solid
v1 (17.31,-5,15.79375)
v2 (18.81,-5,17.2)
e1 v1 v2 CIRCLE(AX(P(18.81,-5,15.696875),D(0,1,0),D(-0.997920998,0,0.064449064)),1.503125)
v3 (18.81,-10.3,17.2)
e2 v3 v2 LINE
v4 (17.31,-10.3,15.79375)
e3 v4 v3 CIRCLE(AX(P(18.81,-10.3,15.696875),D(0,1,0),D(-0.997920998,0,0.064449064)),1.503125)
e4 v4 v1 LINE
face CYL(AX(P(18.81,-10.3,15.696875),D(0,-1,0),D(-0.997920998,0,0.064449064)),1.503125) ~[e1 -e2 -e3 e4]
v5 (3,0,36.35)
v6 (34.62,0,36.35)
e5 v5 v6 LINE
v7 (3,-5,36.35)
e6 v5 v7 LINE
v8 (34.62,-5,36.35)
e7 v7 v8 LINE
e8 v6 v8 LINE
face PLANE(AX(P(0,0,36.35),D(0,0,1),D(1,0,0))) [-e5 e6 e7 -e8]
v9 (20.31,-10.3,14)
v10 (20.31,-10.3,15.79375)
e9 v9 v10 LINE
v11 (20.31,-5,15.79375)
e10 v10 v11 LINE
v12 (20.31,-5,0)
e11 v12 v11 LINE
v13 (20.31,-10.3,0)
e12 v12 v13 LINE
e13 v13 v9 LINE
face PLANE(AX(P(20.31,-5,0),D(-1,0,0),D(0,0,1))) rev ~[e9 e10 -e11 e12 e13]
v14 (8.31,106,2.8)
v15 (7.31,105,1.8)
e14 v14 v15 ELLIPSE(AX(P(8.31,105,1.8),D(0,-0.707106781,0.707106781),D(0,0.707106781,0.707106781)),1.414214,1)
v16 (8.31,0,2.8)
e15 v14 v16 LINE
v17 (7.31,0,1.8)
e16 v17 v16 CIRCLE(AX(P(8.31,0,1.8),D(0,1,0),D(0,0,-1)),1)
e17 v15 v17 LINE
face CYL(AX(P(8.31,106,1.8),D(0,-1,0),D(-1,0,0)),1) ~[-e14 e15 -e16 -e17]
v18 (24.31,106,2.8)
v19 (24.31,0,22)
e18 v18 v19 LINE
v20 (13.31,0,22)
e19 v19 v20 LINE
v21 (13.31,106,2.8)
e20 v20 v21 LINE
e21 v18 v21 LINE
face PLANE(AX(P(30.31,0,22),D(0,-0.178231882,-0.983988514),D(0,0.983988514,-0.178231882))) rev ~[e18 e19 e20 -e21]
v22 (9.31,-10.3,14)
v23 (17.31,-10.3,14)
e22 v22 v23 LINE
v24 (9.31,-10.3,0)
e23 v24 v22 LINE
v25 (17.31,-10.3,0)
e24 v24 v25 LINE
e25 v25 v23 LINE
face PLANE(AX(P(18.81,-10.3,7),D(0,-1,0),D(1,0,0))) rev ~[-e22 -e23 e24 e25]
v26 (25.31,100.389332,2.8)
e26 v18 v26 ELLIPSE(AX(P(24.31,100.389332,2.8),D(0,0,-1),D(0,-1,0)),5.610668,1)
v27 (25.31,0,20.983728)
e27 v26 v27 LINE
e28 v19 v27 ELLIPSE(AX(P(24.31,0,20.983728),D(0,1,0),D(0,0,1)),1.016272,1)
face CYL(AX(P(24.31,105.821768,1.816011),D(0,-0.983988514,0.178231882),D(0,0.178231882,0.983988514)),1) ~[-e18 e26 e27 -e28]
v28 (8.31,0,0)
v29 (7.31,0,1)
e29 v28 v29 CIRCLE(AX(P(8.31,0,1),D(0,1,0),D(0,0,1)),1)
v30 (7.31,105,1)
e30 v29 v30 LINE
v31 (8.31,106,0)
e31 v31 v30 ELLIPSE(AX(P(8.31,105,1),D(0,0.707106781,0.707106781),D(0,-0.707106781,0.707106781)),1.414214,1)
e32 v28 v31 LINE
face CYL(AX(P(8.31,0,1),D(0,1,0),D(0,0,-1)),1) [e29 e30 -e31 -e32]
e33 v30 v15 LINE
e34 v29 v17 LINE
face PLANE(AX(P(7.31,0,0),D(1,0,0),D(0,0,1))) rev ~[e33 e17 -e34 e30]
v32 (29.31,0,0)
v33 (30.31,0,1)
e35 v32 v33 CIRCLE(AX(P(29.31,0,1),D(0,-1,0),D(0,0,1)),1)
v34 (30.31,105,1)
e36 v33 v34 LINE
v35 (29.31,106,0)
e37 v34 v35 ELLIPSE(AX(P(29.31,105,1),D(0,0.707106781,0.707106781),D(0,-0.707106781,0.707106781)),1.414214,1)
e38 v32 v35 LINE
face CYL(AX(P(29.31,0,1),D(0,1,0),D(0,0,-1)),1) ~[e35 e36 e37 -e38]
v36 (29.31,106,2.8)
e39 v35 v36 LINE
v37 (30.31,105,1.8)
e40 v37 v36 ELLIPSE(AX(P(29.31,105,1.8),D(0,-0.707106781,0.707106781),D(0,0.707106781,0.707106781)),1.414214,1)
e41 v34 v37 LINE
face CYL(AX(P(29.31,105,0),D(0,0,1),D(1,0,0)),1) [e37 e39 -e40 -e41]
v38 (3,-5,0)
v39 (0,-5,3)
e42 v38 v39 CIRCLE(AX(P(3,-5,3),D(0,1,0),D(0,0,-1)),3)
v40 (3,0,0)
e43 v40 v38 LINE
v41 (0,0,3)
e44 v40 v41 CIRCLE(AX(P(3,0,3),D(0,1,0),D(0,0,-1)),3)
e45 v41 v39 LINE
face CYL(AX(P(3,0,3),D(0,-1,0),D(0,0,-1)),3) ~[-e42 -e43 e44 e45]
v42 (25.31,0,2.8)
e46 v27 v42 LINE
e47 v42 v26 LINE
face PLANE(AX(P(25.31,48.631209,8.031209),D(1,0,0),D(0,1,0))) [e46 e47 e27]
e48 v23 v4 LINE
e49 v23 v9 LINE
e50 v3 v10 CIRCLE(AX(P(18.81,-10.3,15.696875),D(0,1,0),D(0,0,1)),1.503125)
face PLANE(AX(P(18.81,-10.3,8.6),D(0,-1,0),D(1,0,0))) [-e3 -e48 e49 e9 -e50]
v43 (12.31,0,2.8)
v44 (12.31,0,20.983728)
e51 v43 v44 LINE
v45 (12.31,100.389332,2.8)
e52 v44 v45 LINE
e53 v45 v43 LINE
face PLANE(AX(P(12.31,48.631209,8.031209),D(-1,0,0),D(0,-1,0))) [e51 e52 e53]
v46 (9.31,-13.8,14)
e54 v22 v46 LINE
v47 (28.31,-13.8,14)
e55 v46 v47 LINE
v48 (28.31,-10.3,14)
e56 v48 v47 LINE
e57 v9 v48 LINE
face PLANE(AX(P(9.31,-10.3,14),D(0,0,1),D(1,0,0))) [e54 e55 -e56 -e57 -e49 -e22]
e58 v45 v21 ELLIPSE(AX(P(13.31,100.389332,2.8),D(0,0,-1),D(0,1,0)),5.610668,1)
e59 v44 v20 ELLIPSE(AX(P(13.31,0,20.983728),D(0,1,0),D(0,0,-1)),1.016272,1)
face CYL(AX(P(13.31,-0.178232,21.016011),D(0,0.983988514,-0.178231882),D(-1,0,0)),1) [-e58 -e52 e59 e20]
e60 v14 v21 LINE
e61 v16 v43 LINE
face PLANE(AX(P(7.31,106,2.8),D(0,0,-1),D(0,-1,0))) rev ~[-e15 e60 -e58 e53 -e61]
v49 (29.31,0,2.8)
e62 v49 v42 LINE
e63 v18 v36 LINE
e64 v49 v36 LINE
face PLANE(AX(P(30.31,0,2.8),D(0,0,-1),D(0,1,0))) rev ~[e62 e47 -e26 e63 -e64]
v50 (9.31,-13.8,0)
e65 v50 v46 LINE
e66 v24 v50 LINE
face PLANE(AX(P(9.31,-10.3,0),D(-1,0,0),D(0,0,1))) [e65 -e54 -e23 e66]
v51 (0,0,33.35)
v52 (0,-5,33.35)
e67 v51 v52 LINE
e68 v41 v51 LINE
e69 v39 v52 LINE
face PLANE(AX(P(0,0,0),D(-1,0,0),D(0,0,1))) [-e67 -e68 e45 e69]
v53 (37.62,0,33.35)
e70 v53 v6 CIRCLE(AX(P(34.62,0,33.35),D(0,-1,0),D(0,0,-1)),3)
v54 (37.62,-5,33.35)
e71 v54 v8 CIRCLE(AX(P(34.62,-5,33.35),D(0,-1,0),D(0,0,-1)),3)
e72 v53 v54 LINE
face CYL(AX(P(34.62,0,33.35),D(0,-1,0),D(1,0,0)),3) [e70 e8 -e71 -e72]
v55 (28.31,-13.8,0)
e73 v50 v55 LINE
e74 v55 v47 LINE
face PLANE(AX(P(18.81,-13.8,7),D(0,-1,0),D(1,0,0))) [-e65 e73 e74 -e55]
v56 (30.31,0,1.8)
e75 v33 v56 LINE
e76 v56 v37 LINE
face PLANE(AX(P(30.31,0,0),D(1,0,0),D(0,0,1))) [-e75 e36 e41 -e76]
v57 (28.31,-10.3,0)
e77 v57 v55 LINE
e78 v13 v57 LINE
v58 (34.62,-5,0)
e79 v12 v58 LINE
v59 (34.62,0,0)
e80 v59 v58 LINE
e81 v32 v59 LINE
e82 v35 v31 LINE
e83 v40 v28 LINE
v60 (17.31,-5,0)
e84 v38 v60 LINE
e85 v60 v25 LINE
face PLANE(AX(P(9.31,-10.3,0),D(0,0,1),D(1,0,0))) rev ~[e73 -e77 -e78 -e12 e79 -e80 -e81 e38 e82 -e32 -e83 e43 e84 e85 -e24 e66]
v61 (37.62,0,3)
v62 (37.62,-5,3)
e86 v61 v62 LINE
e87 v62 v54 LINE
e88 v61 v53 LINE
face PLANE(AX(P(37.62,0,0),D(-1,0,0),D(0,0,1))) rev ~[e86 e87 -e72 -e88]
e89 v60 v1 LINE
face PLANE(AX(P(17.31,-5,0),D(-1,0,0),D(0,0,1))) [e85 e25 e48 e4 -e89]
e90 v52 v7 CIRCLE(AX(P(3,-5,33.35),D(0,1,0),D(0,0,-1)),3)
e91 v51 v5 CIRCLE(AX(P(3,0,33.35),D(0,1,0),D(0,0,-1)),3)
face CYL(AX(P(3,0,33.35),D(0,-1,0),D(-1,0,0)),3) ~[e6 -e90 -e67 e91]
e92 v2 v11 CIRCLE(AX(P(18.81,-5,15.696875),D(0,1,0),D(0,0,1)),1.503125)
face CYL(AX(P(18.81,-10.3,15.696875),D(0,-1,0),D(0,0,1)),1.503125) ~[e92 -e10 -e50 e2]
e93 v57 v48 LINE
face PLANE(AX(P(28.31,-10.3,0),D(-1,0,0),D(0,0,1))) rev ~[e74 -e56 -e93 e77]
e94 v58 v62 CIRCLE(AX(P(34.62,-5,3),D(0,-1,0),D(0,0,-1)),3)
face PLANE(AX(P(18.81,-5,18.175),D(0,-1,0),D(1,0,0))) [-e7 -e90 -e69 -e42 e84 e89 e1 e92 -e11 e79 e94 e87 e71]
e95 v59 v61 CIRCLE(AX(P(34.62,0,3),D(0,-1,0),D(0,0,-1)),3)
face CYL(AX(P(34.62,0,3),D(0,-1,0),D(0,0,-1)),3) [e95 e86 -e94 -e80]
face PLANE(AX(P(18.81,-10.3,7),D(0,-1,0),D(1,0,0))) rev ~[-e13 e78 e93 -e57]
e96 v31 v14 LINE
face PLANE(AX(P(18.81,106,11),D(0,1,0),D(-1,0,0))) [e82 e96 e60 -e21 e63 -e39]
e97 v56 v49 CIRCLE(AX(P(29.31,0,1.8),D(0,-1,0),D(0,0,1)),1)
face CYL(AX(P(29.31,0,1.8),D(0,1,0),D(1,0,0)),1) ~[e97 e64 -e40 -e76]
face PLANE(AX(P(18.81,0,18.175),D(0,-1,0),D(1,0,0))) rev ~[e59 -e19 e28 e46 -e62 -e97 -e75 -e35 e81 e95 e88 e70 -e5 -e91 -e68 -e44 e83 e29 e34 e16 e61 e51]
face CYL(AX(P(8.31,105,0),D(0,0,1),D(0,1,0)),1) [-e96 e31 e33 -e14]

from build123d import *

# Parameters (mm, degrees)
F0_W      = 37.62
F0_H      = 36.35
F1_DEPTH  = 5
F2_W      = 3
F2_H      = 17.2
F3_DEPTH  = 5.3
F4_W      = 19
F4_H      = 14
F5_DEPTH  = 3.5
F6_W      = 23
F6_H      = 22
F7_DEPTH  = 106
F9_DEPTH  = 25
F11_DEPTH = 5
F13_DEPTH = 5
F14_R     = 3
F16_DEPTH = 5.3
F17_R     = 1


with BuildPart() as f1:
    # F0 (on Front) → F1 (new body)
    with BuildSketch(Plane.XZ):
        with Locations((18.81, 18.175)):
            Rectangle(F0_W, F0_H)
    extrude(amount=F1_DEPTH)

    # F2 (on face) → F3 (join)
    with BuildSketch(Plane.XZ.offset(5)):
        with Locations((18.81, 8.6)):
            Rectangle(F2_W, F2_H)
    extrude(amount=F3_DEPTH)

    # F4 (on face) → F5 (join)
    with BuildSketch(Plane.XZ.offset(10.3)):
        with Locations((18.81, 7)):
            Rectangle(F4_W, F4_H)
    extrude(amount=F5_DEPTH)

    # F6 (on face) → F7 (join)
    with BuildSketch(Plane(origin=(0, 0, 0), x_dir=(-1, 0, 0), z_dir=(0, 1, 0))):
        with Locations((-18.81, 11)):
            Rectangle(F6_W, F6_H)
    extrude(amount=F7_DEPTH)

    # F8 (on face) → F9 (cut)
    with BuildSketch(Plane.YZ.offset(30.31)):
        Polygon((106, 22), (0, 22), (106, 2.8), align=None)
    extrude(amount=-F9_DEPTH, mode=Mode.SUBTRACT)

    # F10 (on face) → F11 (cut)
    with BuildSketch(Plane.YZ.offset(30.31)):
        Polygon((0, 2.8), (106, 2.8), (0, 22), align=None)
    extrude(amount=-F11_DEPTH, mode=Mode.SUBTRACT)

    # F12 (on face) → F13 (cut)
    with BuildSketch(Plane(origin=(7.31, 0, 0), x_dir=(0, -1, 0), z_dir=(-1, 0, 0))):
        Polygon((0, 22), (-106, 2.8), (0, 2.8), align=None)
    extrude(amount=-F13_DEPTH, mode=Mode.SUBTRACT)

    # F14
    f14_edges = [f1.edges().sort_by_distance(p)[0] for p in [
        (37.62, -2.5, 0),
        (37.62, -2.5, 36.35),
        (0, -2.5, 36.35),
        (0, -2.5, 0),
    ]]
    fillet(f14_edges, radius=F14_R)

    # F15 (on face) → F16 (cut, through all)
    with BuildSketch(Plane.XZ.offset(10.3)):
        with BuildLine():
            ThreePointArc((17.31, 15.79375), (17.7819509907, 16.79346061), (18.81, 17.2))
            Line((18.81, 17.2), (17.31, 17.2))
            Line((17.31, 17.2), (17.31, 15.79375))
        make_face()
        with BuildLine():
            ThreePointArc((18.81, 17.2), (19.8380490093, 16.79346061), (20.31, 15.79375))
            Line((20.31, 15.79375), (20.31, 17.2))
            Line((20.31, 17.2), (18.81, 17.2))
        make_face()
    extrude(amount=-F16_DEPTH, mode=Mode.SUBTRACT)

    # F17
    f17_edges = [f1.edges().sort_by_distance(p)[0] for p in [
        (30.31, 106, 1.4),
        (7.31, 106, 1.4),
        (7.31, 53, 2.8),
        (7.31, 53, 0),
        (25.31, 53, 12.4),
        (30.31, 53, 2.8),
        (30.31, 53, 0),
        (12.31, 53, 12.4),
    ]]
    fillet(f17_edges, radius=F17_R)


solid = f1.part
